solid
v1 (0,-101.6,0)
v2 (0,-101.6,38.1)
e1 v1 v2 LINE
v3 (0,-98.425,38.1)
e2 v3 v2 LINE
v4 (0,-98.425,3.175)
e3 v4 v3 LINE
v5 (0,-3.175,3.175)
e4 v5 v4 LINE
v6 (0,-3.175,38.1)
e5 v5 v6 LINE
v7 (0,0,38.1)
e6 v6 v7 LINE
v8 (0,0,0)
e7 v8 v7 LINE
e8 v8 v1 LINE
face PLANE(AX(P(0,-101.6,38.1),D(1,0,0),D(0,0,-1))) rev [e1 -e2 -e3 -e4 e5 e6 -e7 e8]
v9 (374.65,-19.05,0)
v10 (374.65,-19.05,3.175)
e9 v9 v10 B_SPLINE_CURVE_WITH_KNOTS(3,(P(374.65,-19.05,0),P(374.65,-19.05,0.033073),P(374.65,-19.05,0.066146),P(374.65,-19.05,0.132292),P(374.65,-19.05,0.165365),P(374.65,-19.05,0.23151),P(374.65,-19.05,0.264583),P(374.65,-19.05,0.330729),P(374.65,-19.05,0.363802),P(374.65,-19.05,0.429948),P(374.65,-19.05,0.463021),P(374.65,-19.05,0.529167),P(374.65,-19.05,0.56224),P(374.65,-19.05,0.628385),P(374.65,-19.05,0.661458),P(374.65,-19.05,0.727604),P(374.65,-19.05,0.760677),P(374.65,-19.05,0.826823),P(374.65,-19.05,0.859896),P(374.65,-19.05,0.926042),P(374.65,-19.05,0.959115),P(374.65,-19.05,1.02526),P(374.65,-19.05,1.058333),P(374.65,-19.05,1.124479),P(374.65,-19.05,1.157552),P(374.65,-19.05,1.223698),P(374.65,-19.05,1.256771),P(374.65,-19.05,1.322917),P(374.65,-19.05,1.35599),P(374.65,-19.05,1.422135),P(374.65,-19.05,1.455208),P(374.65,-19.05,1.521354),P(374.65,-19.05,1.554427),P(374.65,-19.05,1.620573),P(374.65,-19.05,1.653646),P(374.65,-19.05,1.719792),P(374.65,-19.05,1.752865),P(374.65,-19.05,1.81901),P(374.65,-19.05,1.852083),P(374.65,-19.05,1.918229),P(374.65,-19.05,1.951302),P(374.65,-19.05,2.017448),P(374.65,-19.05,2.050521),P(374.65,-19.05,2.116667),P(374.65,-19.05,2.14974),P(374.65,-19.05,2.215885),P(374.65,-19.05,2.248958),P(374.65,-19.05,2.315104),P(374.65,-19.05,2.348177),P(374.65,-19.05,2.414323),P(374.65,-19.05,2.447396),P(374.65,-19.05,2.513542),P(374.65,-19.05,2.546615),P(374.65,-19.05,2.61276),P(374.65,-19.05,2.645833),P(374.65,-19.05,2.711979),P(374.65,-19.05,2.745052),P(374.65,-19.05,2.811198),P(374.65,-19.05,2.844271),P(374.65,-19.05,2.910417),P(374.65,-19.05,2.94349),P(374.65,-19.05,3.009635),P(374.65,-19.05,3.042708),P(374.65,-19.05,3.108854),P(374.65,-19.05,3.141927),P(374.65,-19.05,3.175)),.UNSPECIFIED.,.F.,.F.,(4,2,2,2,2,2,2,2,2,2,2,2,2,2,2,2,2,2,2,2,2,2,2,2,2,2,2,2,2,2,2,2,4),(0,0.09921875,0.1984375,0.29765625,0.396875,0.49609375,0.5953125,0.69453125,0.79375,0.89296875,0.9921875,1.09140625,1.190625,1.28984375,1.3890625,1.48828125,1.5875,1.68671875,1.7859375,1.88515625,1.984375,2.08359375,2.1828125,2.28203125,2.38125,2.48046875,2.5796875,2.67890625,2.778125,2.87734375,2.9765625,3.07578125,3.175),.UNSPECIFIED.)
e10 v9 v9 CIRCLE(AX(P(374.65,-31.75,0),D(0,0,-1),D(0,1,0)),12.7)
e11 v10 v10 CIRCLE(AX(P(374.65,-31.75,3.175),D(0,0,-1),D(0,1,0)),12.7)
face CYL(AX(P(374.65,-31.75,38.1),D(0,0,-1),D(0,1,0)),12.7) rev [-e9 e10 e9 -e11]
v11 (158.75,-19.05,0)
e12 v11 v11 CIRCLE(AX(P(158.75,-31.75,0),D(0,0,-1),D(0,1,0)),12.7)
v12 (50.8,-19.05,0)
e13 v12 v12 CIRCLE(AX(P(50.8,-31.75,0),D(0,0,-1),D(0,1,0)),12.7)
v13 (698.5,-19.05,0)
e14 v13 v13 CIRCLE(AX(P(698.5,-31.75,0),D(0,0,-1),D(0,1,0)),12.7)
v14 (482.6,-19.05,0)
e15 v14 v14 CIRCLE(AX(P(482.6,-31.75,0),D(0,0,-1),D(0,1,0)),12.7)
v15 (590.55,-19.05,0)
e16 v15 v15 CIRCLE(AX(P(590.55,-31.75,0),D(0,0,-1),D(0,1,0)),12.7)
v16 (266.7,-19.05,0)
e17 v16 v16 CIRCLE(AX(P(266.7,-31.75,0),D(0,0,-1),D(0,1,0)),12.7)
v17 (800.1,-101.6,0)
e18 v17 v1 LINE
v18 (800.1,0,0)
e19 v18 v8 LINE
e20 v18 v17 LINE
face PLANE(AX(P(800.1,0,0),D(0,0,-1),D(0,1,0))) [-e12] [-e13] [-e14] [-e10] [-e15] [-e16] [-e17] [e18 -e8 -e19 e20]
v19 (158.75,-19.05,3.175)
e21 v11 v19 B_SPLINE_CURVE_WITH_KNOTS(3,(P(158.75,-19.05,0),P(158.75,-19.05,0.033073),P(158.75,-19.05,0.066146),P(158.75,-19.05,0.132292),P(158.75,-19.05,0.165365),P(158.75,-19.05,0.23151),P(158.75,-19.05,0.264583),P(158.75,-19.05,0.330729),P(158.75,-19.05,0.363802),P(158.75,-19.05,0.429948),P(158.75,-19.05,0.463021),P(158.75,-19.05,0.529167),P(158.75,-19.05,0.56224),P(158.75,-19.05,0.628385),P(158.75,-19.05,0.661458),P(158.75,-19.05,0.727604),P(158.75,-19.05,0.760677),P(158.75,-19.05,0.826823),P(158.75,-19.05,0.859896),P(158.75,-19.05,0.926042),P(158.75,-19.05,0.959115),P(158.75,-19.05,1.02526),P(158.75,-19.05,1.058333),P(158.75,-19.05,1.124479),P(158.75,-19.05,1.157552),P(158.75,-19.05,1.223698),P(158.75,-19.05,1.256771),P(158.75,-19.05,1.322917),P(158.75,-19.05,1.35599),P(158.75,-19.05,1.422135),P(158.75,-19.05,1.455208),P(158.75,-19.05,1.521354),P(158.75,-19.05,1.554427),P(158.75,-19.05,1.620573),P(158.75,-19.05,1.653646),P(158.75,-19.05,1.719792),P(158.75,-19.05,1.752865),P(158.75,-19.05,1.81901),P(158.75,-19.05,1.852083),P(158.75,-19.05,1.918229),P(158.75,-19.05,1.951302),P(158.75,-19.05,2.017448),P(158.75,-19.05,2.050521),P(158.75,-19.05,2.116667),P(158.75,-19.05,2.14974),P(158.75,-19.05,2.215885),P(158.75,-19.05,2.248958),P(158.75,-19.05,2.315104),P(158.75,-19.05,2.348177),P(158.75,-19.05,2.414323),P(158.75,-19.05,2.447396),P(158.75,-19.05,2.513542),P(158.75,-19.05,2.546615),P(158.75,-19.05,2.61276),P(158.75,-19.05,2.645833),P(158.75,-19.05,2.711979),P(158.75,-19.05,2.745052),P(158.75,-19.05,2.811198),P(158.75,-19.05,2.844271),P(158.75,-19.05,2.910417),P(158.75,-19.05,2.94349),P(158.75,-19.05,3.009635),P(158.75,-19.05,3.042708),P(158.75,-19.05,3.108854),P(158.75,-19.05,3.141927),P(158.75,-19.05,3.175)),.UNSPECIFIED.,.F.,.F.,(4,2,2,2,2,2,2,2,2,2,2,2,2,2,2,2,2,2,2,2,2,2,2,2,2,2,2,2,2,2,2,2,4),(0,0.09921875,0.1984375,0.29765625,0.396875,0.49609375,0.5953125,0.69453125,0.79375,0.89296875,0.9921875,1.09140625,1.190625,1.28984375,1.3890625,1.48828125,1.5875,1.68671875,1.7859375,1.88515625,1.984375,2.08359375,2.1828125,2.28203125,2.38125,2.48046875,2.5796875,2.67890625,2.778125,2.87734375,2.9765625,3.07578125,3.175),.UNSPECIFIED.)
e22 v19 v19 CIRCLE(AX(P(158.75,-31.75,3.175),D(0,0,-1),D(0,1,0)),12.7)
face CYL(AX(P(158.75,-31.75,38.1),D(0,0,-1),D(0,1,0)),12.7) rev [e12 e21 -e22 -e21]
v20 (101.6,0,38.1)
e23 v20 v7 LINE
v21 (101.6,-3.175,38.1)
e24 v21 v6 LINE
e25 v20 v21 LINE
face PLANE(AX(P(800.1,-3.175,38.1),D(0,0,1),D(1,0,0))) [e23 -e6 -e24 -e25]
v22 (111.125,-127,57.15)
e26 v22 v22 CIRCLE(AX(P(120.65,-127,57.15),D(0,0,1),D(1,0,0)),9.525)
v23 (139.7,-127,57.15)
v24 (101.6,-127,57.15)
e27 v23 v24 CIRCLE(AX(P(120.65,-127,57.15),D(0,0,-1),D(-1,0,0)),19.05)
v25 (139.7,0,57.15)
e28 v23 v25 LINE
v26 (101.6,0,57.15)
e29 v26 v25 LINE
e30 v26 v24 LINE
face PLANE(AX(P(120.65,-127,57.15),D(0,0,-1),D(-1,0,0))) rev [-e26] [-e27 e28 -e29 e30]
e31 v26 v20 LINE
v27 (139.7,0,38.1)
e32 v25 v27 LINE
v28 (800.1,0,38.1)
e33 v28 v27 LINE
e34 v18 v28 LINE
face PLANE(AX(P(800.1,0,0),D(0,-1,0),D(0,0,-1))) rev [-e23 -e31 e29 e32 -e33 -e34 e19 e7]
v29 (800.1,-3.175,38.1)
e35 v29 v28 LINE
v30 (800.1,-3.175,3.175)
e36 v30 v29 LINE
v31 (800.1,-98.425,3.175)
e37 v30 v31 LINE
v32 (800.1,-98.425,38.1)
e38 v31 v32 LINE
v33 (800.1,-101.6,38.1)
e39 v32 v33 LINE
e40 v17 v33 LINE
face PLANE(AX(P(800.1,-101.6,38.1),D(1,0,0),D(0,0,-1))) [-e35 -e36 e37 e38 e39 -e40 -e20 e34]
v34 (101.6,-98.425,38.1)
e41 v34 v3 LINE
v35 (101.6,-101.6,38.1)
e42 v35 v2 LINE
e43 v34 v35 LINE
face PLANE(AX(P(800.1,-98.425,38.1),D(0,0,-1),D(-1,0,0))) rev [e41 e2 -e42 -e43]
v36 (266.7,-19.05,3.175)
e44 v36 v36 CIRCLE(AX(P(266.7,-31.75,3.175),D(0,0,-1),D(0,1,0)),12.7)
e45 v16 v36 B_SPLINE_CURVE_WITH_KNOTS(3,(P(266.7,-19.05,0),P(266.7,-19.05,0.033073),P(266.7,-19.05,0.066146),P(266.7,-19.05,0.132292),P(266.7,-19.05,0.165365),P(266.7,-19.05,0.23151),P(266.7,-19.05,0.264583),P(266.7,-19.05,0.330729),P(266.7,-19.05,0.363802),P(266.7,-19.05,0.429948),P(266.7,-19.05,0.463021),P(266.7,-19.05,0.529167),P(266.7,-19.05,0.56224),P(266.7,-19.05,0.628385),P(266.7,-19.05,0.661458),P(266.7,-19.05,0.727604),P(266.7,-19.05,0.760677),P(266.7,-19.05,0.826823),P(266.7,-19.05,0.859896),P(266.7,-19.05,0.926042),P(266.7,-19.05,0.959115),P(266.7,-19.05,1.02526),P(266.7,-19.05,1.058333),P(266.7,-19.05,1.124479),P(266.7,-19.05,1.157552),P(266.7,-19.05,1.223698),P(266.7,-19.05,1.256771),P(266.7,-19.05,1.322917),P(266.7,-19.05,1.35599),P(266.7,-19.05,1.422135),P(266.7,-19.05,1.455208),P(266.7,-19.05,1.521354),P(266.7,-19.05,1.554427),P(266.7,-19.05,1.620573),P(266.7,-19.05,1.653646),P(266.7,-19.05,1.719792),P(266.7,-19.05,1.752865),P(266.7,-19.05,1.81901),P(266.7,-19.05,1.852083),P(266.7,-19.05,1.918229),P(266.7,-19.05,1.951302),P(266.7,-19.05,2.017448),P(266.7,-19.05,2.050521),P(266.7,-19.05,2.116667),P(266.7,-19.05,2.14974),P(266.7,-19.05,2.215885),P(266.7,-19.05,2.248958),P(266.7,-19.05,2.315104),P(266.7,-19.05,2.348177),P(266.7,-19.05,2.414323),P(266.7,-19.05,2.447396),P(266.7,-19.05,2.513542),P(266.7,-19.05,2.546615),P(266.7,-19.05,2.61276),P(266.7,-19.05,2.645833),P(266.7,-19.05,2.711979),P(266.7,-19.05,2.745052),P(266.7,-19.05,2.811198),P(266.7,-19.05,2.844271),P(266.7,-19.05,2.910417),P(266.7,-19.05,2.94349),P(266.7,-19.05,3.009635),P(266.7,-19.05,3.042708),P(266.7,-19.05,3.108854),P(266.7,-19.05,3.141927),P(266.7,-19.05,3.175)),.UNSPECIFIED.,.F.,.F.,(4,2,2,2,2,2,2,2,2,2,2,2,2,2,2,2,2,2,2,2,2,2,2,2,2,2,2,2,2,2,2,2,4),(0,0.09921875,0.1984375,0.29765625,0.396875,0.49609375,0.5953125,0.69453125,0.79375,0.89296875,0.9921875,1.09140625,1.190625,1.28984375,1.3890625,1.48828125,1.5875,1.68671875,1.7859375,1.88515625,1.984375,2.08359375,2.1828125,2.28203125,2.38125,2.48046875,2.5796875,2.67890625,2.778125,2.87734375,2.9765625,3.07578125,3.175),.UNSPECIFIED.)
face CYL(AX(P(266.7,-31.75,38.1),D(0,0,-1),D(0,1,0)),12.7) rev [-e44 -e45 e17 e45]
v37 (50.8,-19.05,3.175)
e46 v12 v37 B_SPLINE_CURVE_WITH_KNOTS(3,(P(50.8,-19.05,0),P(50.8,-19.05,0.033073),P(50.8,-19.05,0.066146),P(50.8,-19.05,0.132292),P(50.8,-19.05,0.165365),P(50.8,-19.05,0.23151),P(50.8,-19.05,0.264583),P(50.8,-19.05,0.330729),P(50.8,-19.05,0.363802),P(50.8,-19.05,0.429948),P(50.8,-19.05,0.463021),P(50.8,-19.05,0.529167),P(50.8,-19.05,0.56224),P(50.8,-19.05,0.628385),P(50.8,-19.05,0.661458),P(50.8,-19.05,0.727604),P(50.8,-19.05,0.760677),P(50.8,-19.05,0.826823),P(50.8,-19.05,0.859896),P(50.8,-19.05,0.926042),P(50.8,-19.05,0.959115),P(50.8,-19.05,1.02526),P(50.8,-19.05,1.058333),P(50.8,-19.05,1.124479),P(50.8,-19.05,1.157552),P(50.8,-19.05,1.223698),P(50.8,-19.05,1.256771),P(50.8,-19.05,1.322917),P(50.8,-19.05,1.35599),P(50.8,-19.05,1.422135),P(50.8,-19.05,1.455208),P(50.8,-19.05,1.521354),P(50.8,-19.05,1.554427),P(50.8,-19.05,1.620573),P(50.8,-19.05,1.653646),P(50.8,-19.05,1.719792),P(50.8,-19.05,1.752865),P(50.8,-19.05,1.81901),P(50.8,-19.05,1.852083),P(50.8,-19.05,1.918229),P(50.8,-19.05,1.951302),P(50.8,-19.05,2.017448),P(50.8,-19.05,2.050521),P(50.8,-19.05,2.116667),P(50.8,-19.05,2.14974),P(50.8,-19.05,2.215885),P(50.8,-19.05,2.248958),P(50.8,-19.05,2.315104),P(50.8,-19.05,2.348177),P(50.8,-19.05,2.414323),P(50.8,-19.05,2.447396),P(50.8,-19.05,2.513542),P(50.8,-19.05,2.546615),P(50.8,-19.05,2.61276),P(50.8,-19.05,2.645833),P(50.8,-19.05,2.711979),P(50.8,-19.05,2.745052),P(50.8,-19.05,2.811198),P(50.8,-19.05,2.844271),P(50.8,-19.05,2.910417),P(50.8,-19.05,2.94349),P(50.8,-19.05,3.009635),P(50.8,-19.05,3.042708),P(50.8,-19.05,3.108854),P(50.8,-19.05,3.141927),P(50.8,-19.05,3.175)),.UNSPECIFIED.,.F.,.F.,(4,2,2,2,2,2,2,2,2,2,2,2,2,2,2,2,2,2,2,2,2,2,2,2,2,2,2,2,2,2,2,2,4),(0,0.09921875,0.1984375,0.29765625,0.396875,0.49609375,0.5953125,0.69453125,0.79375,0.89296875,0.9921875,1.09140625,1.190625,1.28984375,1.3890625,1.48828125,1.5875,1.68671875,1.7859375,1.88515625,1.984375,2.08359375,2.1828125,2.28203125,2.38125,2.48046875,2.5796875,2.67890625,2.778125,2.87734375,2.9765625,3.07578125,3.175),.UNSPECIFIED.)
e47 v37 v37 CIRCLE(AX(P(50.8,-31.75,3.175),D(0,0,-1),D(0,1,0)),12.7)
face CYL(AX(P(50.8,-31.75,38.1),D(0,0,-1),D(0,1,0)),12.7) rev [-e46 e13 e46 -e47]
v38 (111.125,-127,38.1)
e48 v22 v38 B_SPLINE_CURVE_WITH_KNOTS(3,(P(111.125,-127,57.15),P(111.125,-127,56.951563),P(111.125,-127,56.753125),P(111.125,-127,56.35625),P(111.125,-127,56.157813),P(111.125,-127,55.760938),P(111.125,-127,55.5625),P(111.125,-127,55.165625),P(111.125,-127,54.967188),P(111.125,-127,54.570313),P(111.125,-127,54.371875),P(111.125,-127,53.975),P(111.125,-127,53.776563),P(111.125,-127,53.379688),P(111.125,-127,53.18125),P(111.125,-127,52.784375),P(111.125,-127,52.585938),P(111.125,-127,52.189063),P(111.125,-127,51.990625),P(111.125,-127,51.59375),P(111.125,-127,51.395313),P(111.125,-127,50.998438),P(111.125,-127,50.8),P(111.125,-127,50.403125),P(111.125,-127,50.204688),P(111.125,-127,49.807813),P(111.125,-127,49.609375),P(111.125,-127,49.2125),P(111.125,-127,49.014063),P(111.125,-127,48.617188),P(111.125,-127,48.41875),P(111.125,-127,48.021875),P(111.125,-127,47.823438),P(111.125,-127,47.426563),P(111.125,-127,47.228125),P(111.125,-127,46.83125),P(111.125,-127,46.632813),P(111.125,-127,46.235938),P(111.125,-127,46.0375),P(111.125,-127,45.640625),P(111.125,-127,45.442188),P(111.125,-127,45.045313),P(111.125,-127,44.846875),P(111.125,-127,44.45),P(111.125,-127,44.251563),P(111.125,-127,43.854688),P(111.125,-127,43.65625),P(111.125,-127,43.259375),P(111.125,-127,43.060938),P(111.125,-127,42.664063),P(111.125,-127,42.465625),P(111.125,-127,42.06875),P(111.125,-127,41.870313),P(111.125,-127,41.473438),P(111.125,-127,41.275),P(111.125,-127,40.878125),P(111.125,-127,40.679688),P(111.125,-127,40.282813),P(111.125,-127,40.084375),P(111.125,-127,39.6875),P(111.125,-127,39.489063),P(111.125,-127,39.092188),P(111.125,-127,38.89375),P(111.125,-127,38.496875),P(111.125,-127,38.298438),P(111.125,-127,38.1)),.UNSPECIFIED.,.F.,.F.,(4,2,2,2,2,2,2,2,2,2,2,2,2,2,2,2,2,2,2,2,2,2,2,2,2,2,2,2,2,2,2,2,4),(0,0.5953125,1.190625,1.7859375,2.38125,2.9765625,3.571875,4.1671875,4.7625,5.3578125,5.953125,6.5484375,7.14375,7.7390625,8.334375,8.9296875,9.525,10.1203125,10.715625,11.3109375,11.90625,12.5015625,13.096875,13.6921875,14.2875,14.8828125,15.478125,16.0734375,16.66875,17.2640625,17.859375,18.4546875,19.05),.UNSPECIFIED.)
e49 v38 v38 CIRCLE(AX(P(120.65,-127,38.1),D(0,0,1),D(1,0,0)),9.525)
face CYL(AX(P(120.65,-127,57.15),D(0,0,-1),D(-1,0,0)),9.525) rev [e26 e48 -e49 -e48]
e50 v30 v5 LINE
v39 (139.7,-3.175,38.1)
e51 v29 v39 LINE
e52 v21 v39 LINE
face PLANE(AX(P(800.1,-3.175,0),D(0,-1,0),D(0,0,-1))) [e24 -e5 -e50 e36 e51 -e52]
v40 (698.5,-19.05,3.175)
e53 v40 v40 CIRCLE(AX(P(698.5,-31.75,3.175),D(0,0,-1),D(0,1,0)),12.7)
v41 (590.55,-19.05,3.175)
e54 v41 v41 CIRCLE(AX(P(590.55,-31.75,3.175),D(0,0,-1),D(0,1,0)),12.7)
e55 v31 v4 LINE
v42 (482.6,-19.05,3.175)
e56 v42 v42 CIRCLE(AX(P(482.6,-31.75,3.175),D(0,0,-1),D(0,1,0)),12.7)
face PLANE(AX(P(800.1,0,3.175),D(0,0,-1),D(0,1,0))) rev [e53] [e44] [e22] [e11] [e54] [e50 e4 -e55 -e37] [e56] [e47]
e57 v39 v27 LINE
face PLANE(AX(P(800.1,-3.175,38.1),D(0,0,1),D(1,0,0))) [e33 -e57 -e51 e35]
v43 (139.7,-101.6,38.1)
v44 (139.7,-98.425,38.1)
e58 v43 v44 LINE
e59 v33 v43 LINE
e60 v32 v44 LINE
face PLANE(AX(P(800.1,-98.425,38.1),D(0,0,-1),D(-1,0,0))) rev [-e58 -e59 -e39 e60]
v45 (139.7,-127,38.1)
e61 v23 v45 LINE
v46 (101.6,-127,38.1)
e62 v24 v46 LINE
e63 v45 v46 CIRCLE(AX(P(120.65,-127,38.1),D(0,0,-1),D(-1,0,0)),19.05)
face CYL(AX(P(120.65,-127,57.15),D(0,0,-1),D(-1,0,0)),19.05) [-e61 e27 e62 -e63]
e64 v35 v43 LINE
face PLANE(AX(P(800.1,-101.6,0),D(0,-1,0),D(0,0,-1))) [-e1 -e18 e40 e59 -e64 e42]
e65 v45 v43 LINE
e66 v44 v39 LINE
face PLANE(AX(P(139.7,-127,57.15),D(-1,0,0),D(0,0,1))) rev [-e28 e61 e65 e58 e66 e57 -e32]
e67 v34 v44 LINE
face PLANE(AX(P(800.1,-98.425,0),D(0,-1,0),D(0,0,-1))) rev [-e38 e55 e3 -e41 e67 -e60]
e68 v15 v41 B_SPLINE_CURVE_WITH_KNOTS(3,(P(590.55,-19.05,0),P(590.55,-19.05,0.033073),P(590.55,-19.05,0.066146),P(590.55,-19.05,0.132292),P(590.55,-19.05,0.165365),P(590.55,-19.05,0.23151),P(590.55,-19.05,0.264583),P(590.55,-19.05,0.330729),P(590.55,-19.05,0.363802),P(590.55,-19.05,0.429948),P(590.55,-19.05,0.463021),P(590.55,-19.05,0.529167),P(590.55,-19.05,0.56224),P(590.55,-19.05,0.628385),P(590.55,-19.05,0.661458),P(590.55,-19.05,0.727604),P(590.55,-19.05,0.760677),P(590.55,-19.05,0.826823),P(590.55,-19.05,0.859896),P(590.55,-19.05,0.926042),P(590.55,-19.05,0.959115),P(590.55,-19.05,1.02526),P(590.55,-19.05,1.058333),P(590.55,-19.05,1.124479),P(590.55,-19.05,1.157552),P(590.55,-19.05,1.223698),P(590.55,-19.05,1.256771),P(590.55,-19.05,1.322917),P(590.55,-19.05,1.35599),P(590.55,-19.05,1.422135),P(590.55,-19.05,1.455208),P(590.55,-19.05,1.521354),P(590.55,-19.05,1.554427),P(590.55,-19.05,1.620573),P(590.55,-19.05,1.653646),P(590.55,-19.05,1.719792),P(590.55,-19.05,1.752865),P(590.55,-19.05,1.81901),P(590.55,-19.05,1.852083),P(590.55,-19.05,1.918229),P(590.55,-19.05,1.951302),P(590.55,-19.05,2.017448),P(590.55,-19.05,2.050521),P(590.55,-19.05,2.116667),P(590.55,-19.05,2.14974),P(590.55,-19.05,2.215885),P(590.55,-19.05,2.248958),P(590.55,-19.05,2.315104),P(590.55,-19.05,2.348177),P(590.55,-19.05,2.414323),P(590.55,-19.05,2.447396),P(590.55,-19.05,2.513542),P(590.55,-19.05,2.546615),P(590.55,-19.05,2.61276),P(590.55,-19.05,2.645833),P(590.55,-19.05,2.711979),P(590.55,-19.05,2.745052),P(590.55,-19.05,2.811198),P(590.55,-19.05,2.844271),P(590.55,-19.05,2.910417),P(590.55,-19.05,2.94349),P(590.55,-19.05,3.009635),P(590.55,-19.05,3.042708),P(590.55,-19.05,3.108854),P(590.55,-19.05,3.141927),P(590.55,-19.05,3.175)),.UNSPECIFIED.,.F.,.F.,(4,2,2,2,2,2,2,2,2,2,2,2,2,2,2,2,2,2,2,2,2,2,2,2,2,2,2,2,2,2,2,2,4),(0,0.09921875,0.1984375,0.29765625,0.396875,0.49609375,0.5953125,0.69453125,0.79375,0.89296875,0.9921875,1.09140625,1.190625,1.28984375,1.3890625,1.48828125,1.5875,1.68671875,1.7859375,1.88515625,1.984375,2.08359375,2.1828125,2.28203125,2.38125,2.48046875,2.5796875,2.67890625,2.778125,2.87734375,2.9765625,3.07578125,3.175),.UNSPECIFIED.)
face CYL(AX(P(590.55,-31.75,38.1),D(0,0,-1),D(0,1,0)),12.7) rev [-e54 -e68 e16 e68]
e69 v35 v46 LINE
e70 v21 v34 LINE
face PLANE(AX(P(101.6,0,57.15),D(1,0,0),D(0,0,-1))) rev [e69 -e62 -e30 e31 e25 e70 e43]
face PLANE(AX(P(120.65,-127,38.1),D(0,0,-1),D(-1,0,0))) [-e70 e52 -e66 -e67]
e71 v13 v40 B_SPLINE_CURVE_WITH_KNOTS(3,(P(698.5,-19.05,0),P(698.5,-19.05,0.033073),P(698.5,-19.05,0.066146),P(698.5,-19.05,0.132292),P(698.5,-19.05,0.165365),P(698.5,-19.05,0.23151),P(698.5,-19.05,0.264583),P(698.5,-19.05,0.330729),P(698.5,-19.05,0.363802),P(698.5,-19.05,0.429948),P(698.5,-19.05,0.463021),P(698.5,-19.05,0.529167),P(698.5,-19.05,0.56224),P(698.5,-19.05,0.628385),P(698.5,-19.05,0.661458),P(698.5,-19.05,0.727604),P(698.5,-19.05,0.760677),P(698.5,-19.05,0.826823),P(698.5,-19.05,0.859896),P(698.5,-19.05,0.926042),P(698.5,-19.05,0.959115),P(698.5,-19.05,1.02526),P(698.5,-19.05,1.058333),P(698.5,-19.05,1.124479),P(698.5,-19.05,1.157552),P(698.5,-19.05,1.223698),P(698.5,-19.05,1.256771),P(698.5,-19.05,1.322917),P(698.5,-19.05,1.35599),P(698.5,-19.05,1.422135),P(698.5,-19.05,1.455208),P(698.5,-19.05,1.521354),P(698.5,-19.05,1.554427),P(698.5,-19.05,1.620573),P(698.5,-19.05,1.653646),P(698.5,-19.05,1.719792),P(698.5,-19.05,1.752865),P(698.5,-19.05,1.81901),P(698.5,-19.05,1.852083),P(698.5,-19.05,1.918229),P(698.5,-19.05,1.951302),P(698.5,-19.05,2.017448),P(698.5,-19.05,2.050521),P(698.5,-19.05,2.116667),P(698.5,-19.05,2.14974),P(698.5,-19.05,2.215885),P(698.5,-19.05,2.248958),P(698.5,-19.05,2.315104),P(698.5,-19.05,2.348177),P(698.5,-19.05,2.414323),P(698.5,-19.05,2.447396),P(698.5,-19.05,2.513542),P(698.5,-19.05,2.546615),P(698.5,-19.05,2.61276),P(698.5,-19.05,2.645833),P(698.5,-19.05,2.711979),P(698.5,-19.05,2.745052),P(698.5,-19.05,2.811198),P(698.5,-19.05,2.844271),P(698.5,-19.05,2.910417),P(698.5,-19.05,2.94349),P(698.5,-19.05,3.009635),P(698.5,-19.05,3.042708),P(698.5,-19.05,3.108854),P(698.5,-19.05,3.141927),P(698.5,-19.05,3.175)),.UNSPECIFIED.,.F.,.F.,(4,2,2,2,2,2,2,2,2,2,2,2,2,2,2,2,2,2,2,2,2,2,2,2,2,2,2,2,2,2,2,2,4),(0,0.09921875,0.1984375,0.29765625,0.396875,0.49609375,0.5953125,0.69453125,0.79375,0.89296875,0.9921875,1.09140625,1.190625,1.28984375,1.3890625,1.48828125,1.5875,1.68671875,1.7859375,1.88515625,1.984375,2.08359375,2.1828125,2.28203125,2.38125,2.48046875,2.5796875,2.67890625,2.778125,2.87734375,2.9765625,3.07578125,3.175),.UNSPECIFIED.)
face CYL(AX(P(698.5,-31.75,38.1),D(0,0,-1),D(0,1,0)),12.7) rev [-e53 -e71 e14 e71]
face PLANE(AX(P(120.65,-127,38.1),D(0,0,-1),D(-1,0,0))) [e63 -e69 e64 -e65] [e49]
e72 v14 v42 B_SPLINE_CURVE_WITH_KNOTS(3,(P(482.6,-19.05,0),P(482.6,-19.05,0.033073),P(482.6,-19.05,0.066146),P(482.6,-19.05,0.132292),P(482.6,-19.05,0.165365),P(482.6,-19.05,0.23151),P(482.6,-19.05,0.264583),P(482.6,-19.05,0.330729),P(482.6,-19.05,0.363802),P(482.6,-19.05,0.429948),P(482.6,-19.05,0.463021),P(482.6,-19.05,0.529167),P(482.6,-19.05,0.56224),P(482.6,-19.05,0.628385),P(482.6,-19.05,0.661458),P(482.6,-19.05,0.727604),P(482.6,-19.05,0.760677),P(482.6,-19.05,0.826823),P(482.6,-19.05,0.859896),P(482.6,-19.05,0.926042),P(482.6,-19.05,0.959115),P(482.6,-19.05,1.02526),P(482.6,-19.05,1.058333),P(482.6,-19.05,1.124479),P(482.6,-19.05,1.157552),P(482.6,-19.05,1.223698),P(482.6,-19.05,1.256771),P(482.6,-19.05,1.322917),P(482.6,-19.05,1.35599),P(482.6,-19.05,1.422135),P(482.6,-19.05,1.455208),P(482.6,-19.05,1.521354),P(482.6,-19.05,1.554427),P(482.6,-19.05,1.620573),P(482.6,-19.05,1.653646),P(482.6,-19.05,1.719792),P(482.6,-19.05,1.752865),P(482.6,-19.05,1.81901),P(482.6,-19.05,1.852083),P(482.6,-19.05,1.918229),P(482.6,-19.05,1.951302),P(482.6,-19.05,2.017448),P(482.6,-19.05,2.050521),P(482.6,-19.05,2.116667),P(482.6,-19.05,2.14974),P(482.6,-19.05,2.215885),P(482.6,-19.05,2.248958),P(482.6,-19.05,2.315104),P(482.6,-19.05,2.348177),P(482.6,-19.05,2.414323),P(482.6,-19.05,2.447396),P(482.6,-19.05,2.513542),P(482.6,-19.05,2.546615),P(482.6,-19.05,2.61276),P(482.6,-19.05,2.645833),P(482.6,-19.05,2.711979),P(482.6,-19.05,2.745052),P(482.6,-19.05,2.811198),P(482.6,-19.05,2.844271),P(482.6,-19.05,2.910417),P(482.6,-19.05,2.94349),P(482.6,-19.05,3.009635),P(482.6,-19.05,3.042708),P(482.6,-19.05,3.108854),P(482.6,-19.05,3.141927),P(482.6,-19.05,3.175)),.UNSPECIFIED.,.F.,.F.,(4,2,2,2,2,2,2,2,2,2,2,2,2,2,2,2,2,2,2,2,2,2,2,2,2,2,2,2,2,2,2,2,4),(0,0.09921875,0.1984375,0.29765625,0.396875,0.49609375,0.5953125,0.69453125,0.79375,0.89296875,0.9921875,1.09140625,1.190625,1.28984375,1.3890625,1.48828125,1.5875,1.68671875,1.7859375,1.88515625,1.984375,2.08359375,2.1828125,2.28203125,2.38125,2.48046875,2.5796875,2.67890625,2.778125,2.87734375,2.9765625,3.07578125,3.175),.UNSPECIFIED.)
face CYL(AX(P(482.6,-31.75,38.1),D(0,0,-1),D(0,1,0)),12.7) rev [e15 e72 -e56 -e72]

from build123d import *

# Parameters (mm, degrees)
BASE_EXTRUDE_THIN_DEPTH = 800.1
SKETCH2_R               = 12.7
CUT_EXTRUDE1_DEPTH      = 808.424411323
LPATTERN1_COUNT         = 7
LPATTERN1_PITCH         = 107.95
BOSS_EXTRUDE1_START     = 38.1
BOSS_EXTRUDE1_OUTLINE_R = 9.525
BOSS_EXTRUDE1_DEPTH     = 19.05


# Read off the part's stored shape, not the designer's step: Boss-Extrude1
with BuildPart() as part:
    # Sketch1 → Base-Extrude-Thin (new body)
    with BuildSketch(Plane(origin=(0, 0, 0), x_dir=(0, 0, -1), z_dir=(1, 0, 0))):
        Polygon((-38.1, 0), (0, 0), (0, -101.6), (-38.1, -101.6), (-38.1, -98.425), (-3.175, -98.425), (-3.175, -3.175), (-38.1, -3.175), align=None)
    extrude(amount=BASE_EXTRUDE_THIN_DEPTH)

    # Sketch2 → Cut-Extrude1 (cut, through all)
    with BuildSketch(Plane(origin=(0, 0, 0), x_dir=(-1, 0, 0), z_dir=(0, 0, -1))):
        with Locations(Location((-50.8, -31.75, 0), (0, 0, 90))):
            Circle(SKETCH2_R)
    cut_extrude1 = extrude(amount=-CUT_EXTRUDE1_DEPTH, mode=Mode.SUBTRACT)

    # LPattern1: Cut-Extrude1 ×7
    with Locations(*[(i * LPATTERN1_PITCH, 0, 0) for i in range(1, LPATTERN1_COUNT)]):
        add(cut_extrude1, mode=Mode.SUBTRACT)

    # Boss-Extrude1 outline → Boss-Extrude1 (add)
    with BuildSketch(Plane.XY.offset(BOSS_EXTRUDE1_START)):
        with BuildLine():
            Line((101.6, 0), (101.6, -127))
            ThreePointArc((101.6, -127), (120.65, -146.05), (139.7, -127))
            Line((139.7, -127), (139.7, 0))
            Line((139.7, 0), (101.6, 0))
        make_face()
        with Locations((120.65, -127)):
            Circle(BOSS_EXTRUDE1_OUTLINE_R, mode=Mode.SUBTRACT)
    extrude(amount=BOSS_EXTRUDE1_DEPTH)


solid = part.part
